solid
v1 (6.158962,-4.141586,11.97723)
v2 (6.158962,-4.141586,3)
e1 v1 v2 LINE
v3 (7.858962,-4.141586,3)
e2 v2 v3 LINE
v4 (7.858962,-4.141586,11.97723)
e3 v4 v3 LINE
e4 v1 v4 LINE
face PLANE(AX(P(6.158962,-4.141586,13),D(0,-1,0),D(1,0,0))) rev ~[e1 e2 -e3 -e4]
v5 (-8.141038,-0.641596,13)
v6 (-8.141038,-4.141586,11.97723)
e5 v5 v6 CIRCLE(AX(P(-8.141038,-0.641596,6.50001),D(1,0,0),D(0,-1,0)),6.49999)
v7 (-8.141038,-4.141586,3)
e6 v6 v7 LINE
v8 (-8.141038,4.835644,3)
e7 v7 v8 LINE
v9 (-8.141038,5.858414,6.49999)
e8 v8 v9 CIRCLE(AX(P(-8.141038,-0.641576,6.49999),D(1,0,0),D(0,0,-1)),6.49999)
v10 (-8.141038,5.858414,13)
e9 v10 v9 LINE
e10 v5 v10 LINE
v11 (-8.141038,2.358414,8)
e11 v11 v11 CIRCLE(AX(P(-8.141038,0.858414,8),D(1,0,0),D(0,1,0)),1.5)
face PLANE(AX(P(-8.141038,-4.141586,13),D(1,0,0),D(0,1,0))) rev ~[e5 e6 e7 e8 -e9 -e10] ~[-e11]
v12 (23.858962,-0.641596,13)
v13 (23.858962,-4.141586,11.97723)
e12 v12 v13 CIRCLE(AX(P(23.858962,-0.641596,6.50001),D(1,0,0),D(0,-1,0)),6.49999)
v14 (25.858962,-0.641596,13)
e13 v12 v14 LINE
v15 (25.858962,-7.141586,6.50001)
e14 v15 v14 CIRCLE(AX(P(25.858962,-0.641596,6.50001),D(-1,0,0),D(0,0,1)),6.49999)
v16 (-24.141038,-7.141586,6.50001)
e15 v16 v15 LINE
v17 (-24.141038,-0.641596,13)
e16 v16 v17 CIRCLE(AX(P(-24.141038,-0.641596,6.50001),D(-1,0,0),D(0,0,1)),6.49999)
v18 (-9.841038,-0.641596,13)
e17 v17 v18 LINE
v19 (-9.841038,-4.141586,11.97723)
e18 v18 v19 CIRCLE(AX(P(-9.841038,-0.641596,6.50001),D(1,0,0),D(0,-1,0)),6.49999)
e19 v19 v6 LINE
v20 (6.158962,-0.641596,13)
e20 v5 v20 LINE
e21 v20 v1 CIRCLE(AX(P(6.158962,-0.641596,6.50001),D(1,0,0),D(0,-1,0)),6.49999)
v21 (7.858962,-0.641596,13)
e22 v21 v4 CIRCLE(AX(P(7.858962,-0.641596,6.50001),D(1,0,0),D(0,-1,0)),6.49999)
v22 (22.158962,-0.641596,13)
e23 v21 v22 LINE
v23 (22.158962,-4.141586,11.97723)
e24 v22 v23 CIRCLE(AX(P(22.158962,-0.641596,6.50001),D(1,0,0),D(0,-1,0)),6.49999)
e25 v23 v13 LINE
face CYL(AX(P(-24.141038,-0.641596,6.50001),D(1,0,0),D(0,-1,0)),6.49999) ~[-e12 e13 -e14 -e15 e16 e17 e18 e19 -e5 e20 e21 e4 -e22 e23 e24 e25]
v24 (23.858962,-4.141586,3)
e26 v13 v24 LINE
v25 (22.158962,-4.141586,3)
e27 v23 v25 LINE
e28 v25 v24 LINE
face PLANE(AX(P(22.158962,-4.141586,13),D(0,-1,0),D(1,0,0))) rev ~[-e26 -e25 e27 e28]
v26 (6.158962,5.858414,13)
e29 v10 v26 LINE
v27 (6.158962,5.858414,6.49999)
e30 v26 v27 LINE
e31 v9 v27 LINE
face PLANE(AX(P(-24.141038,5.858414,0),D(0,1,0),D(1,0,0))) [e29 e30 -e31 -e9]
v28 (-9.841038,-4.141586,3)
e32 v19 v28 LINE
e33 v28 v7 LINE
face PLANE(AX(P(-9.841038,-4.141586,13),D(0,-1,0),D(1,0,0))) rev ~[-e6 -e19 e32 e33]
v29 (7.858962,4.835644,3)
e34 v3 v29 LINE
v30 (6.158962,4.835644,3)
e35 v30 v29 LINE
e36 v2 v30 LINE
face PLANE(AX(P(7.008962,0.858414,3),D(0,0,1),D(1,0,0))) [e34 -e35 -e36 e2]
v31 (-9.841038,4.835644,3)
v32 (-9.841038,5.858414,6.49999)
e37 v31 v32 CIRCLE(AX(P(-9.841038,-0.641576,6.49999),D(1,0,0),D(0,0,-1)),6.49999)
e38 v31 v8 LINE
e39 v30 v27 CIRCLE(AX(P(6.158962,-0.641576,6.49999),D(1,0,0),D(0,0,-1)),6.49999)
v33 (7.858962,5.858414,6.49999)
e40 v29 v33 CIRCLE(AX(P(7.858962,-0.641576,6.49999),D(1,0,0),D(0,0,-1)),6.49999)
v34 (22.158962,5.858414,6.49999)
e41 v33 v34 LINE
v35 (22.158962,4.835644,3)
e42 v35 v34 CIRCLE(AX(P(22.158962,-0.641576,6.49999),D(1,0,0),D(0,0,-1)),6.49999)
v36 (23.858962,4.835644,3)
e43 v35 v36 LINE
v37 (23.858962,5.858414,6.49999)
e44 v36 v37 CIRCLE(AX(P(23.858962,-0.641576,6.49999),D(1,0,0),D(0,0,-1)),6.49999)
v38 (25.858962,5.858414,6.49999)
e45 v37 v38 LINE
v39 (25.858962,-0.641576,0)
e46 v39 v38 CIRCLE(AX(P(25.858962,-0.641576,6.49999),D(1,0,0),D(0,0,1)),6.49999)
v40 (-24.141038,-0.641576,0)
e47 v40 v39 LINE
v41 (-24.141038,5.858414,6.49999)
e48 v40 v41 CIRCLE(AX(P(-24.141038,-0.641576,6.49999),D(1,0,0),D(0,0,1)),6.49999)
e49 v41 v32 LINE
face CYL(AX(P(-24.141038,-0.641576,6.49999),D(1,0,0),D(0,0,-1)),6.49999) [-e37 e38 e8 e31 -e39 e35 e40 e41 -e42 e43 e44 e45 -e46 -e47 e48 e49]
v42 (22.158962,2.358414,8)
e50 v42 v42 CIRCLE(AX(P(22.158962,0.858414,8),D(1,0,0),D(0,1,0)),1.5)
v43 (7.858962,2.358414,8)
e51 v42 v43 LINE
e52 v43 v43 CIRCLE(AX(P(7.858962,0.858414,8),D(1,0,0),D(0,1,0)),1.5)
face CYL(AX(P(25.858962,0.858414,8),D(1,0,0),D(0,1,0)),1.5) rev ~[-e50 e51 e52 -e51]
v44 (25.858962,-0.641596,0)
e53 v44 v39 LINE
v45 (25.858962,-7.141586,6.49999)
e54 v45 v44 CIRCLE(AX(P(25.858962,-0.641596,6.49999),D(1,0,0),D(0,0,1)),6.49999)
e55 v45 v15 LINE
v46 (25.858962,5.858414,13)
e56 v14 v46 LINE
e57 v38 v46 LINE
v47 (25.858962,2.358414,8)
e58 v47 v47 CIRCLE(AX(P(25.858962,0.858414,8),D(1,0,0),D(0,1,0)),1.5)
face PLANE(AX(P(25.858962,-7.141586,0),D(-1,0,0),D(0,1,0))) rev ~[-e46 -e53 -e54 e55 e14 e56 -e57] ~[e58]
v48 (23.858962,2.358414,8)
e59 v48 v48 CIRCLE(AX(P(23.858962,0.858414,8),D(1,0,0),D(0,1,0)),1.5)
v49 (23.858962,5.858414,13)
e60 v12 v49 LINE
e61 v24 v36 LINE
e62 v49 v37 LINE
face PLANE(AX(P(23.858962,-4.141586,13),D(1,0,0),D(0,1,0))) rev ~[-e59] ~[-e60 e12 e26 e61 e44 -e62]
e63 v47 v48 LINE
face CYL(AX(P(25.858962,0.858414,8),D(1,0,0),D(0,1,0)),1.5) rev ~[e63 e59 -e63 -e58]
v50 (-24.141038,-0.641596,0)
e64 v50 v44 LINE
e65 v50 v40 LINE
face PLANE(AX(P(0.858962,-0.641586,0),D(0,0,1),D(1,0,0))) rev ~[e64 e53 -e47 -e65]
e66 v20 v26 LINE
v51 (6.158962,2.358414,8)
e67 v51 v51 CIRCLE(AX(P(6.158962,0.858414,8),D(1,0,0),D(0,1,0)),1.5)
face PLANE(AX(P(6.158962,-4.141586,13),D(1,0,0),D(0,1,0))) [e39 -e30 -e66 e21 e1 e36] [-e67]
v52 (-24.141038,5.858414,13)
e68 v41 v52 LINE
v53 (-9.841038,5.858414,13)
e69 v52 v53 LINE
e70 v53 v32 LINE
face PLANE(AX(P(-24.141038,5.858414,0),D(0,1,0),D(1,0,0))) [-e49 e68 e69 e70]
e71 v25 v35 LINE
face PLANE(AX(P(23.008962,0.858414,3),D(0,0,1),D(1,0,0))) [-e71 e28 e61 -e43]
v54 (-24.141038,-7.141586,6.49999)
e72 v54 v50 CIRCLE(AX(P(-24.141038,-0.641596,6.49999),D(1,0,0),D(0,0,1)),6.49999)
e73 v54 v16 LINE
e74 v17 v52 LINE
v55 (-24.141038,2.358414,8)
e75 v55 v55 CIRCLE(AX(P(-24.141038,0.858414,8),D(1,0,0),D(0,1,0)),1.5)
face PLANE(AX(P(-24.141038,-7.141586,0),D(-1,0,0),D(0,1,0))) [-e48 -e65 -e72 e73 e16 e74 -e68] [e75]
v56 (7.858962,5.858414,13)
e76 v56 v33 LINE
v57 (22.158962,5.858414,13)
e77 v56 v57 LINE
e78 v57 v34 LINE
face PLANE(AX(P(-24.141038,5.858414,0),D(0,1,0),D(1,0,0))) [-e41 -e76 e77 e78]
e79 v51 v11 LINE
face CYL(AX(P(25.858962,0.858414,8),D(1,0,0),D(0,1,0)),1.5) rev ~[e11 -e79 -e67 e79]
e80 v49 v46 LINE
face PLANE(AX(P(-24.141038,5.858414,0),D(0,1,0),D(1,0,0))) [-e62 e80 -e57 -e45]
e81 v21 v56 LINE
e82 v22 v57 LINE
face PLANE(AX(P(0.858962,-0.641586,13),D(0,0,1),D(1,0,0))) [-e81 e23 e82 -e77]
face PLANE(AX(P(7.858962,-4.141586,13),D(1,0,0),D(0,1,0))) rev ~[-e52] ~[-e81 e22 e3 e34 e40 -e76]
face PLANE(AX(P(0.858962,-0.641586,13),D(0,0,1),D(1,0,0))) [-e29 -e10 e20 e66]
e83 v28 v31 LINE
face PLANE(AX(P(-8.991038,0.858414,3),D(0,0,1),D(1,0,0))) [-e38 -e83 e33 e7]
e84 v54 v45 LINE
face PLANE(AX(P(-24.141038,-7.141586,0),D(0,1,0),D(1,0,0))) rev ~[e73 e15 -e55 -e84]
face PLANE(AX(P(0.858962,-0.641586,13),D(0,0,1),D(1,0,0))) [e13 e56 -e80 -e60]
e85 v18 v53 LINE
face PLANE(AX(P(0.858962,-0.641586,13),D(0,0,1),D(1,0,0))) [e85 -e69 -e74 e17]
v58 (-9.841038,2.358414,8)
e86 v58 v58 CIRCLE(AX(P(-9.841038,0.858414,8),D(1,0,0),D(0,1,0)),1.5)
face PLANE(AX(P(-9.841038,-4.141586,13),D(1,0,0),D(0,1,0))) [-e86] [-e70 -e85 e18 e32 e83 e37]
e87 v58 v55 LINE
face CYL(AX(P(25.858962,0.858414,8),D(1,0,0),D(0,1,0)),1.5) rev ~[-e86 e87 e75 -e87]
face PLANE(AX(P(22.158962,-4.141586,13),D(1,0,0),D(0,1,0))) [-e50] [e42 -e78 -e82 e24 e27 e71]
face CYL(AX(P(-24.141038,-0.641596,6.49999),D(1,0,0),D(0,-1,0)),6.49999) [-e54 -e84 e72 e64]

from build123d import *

# Parameters (mm, degrees)
F0_W     = 50
F0_H     = 13
F1_DEPTH = 13
F2_R     = 1.5
F3_DEPTH = 50.001
F4_R     = 6.49999
F5_W     = 1.7
F5_H     = 10
F6_DEPTH = 10


# Not quite as in the source:
# - a fillet or chamfer is up to 0.001 mm smaller than in the source, because OpenCascade refuses the exact size
# - a feature names something its author has since deleted; it is built from what else it names


with BuildPart() as f1:
    # F0 (on Top) → F1 (new body)
    with BuildSketch(Plane.XY):
        with Locations((0.8589621633, -0.6415863931)):
            Rectangle(F0_W, F0_H)
    extrude(amount=F1_DEPTH)

    # F2 (on face) → F3 (cut, through all)
    with BuildSketch(Plane.YZ.offset(25.8589621633)):
        with Locations((0.8584136069, 8)):
            Circle(F2_R)
    extrude(amount=-F3_DEPTH, mode=Mode.SUBTRACT)

    # F4 (radius 6.5 in the source; OpenCascade refuses exactly that, so slightly less here)
    f4_edges = [f1.edges().sort_by_distance(p)[0] for p in [
        (0.858962, -7.141586, 13),
        (0.858962, -7.141586, 0),
        (0.858962, 5.858414, 0),
    ]]
    fillet(f4_edges, radius=F4_R)

    # F5 (on face) → F6 (cut)
    with BuildSketch(Plane.XY.offset(13)):
        with Locations((23.0089621633, 0.8584136069)):
            Rectangle(F5_W, F5_H)
        with Locations((7.0089621633, 0.8584136069)):
            Rectangle(F5_W, F5_H)
        with Locations((-8.9910378367, 0.8584136069)):
            Rectangle(F5_W, F5_H)
    extrude(amount=-F6_DEPTH, mode=Mode.SUBTRACT)


solid = f1.part
